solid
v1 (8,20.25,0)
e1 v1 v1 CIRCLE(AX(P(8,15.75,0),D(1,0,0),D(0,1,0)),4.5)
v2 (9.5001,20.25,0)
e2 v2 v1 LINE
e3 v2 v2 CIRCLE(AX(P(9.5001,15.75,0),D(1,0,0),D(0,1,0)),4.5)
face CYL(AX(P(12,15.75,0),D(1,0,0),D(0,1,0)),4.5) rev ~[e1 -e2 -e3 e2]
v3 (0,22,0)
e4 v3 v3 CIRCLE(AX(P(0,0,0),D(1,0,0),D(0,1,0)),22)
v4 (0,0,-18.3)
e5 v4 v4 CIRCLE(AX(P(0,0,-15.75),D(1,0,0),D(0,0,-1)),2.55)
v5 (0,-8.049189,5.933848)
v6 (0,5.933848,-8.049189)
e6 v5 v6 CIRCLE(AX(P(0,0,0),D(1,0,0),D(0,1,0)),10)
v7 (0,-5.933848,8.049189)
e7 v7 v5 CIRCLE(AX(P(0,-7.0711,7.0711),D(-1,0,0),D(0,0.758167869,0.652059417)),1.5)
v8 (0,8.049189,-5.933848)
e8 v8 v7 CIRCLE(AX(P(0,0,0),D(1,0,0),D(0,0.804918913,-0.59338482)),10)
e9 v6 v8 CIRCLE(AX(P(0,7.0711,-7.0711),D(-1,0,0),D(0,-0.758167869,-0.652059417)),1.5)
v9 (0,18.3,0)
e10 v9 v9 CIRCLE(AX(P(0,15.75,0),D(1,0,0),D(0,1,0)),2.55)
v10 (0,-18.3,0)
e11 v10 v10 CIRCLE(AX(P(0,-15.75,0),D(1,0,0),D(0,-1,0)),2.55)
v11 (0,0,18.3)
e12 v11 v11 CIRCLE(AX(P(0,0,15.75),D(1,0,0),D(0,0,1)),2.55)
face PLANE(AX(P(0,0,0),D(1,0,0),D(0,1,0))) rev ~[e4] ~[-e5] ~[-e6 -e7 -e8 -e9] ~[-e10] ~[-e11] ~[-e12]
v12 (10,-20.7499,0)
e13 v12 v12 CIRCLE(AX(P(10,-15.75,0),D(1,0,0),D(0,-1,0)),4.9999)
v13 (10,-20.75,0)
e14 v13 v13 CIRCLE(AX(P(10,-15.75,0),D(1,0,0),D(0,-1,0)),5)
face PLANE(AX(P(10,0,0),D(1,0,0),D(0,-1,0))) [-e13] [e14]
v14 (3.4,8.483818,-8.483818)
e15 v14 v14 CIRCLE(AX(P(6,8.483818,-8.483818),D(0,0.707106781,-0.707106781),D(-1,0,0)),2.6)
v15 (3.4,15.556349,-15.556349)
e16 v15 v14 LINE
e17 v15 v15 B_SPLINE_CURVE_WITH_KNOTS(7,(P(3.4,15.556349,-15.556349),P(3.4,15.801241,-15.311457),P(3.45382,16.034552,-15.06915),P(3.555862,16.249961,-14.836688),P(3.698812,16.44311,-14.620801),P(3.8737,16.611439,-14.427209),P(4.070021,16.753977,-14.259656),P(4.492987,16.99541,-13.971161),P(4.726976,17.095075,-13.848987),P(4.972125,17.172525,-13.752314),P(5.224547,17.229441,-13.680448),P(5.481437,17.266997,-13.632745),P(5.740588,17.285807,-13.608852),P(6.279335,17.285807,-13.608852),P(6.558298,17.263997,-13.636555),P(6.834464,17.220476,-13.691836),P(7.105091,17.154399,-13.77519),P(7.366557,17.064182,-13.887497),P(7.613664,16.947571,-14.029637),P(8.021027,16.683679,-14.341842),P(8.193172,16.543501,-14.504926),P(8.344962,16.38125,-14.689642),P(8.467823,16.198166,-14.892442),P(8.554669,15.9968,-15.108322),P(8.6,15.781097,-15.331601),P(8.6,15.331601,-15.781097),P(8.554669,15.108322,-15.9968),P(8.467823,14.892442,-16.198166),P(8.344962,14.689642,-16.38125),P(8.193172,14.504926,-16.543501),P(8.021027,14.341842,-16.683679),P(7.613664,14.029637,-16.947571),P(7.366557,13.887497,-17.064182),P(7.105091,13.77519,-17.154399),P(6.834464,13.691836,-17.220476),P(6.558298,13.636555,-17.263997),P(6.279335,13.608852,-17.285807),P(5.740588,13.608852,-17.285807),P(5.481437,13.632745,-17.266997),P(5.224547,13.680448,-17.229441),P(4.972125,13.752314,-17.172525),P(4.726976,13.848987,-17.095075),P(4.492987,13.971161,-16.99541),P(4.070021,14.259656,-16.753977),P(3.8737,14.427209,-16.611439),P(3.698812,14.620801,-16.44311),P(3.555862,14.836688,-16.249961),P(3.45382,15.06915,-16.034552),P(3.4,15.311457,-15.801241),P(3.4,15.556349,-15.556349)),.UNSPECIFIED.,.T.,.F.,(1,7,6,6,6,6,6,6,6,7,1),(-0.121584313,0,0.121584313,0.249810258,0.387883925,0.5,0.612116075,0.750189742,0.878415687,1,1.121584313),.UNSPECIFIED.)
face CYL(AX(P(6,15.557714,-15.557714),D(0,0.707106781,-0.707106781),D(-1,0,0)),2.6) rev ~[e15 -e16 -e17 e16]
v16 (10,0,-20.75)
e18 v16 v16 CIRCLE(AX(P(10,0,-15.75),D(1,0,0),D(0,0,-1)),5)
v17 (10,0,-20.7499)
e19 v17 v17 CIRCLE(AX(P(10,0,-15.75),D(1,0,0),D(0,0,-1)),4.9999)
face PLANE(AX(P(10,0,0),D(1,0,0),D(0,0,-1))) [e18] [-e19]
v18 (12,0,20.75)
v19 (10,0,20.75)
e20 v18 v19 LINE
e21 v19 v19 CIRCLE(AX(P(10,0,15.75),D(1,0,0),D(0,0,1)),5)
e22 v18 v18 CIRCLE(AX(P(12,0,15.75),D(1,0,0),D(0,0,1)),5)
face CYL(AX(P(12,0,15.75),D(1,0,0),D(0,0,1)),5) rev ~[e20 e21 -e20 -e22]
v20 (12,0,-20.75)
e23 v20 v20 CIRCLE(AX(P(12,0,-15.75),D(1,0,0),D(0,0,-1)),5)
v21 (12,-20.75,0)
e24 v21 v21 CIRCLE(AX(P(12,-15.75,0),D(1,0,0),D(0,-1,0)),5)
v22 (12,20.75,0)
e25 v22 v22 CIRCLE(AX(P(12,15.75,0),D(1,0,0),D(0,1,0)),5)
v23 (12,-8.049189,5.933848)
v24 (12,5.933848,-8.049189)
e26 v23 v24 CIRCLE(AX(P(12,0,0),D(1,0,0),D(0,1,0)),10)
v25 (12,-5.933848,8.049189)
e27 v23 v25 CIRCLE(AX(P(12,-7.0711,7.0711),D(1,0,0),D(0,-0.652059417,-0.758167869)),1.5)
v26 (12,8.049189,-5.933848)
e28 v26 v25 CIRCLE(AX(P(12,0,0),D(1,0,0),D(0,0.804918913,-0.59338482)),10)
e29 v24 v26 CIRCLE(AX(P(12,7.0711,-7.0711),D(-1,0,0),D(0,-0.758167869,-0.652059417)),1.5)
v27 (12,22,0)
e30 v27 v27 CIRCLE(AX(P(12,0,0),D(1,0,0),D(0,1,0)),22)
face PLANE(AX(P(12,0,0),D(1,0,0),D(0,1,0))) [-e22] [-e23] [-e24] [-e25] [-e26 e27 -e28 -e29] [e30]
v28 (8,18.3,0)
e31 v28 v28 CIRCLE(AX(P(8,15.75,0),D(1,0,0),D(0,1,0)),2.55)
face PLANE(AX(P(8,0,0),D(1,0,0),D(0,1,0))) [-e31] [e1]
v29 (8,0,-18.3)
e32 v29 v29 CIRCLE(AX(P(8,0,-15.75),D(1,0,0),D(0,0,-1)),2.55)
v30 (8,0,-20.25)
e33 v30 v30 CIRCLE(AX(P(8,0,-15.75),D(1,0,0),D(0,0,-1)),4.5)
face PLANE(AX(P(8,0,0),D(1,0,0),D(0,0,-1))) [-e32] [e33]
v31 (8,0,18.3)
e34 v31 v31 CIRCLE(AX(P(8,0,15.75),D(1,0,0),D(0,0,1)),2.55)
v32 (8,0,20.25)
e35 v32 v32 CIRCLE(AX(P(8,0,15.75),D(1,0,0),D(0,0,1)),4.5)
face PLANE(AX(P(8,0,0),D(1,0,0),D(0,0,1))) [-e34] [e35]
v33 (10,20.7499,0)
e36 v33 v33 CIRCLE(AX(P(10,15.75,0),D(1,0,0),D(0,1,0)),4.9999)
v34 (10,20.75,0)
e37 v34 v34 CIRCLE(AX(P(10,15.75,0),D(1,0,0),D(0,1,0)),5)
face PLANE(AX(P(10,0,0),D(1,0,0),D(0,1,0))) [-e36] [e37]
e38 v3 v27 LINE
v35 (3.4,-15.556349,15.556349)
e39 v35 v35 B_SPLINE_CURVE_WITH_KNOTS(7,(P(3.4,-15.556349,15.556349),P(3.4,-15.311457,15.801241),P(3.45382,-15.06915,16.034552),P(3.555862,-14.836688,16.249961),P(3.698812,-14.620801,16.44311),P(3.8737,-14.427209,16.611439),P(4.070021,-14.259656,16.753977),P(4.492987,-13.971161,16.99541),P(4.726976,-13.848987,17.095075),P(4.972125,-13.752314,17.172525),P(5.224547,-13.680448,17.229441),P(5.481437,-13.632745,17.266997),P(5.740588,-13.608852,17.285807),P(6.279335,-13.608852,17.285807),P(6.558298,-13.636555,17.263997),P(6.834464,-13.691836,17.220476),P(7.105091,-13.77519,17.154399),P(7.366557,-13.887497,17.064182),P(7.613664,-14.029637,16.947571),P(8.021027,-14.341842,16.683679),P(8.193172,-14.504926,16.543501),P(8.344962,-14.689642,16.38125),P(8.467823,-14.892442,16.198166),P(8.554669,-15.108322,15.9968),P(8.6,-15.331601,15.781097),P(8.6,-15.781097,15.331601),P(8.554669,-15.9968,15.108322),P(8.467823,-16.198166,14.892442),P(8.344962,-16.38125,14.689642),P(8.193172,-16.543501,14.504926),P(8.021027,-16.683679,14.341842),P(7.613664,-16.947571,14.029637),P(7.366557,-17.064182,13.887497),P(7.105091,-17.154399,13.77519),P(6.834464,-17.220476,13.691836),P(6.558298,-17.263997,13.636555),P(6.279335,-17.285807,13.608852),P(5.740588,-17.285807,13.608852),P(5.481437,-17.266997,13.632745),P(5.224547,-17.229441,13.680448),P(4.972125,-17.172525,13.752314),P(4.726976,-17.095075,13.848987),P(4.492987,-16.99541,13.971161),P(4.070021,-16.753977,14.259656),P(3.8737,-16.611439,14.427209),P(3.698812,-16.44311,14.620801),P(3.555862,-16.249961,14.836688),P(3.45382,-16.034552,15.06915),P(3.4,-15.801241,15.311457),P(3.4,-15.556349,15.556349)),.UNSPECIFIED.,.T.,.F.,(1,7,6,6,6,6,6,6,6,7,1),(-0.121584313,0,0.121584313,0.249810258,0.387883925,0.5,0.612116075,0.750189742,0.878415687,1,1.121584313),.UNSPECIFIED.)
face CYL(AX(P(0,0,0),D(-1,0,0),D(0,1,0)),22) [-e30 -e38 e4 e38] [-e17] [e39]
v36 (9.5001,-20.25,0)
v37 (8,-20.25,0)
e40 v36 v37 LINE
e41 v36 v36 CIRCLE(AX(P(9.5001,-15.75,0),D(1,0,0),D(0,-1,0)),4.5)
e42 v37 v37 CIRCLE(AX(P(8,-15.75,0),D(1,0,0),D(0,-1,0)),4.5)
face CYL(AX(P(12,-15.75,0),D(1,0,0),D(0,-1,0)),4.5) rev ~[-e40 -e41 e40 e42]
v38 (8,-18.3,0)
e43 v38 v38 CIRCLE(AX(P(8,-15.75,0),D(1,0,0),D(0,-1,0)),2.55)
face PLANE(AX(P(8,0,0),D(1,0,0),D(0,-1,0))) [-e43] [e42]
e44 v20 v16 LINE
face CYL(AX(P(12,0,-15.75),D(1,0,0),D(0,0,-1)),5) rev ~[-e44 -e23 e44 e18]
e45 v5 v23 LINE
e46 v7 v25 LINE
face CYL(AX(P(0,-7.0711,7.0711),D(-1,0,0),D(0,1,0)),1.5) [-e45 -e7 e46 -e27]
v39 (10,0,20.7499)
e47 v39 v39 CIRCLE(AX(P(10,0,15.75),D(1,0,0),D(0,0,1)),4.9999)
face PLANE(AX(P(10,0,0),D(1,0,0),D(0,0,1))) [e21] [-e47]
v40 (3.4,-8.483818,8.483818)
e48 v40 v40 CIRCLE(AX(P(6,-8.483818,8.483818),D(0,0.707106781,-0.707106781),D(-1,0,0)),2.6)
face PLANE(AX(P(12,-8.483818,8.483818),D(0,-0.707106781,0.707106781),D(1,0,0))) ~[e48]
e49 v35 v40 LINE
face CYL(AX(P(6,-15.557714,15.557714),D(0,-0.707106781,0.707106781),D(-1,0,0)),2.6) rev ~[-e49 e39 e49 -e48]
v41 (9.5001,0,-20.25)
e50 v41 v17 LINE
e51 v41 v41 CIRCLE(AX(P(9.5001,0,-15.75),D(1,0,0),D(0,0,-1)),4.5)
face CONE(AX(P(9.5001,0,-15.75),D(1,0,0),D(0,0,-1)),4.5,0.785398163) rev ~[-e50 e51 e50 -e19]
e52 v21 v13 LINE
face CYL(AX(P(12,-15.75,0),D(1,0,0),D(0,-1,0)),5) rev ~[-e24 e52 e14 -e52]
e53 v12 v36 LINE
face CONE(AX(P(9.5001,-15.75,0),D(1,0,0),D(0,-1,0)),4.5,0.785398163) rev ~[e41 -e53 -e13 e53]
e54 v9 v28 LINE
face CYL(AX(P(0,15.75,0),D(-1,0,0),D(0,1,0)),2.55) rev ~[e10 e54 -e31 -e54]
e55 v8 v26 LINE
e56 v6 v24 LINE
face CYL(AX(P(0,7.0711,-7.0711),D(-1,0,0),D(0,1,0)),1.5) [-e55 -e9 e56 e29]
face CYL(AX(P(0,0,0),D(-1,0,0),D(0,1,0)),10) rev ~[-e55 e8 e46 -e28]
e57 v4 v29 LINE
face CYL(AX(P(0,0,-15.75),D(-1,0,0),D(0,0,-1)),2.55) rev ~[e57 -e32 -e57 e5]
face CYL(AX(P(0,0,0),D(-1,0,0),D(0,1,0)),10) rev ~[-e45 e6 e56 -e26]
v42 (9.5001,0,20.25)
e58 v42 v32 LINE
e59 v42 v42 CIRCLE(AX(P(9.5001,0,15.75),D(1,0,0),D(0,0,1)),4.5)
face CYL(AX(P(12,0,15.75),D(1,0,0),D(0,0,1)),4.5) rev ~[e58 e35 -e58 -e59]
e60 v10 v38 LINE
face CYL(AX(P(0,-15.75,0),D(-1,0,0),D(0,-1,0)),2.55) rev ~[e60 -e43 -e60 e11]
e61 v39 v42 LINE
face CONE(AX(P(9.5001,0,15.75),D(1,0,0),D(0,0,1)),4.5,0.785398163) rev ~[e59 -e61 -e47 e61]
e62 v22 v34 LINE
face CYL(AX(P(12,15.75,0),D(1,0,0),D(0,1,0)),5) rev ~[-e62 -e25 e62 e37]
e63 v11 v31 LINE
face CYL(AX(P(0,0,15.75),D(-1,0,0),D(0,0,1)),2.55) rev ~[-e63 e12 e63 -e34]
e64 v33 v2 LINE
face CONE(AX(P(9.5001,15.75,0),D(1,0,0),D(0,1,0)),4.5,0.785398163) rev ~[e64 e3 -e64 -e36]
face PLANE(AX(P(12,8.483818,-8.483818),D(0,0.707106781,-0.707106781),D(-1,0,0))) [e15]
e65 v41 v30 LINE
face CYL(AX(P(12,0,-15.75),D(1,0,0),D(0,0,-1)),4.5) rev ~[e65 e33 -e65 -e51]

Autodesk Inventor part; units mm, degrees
ref_plane "YZ Plane" through (0, 0, 0) normal (1, 0, 0) x (0, 1, 0)
ref_plane "XZ Plane" through (0, 0, 0) normal (0, 1, 0) x (-1, 0, 0)
ref_plane "XY Plane" through (0, 0, 0) normal (0, 0, 1) x (1, 0, 0)
sketch "Sketch2" plane through (0, 0, 0) normal (1, 0, 0) x (0, 1, 0)
  circle A0 centre (0, 0) radius 10
  circle A1 centre (0, 0) radius 22
  line L0 (0, 0) -> (7.0711, -7.0711)
  line L1 (0, 0) -> (10, 0) construction
  circle A2 centre (7.0711, -7.0711) radius 1.5
  line L2 (0, 0) -> (10.8294, 10.8294)
  line L3 (0, 0) -> (15.315, 0) construction
  circle A3 centre (-7.0711, 7.0711) radius 1.5
  dimension "d3" = 20
  dimension "d4" = 44
  dimension "d16" = 10
  dimension "d17" = 45
  dimension "d18" = 3
  dimension "d19" = 45
extrude "Extrusion1" add sketch "Sketch2" along normal blind 12 contours A2 A0 | A0 L0 A2 | A3 A0 | A0 A3 | A0 A2 L0 | A1
sketch "Sketch4" plane through (0, 0, 0) normal (1, 0, 0) x (0, 0, -1)
  circle A0 centre (0, 0) radius 15.75
  circle A1 centre (15.75, 0) radius 2.55
  dimension "d9" = 31.5
  dimension "d10" = 5.1
extrude "Extrusion3" cut sketch "Sketch4" along normal blind 30 contours A0 A1 | A0 A1 picked at (14.9184, -0.4924) picked at (16.4994, -0.6699)
sketch "Sketch5" plane through (12, 0, 0) normal (1, 0, 0) x (0, 0, -1)
  circle A0 centre (15.75, 0) radius 2.55 projected
  circle A1 centre (15.75, 0) radius 4.5
  point P0 (0, 0)
  dimension "d20" = 9
extrude "Extrusion4" cut sketch "Sketch5" against normal blind 4
sketch "Sketch6" plane through (12, 0, 0) normal (1, 0, 0) x (0, 0, -1)
  line L0 (0, 0) -> (15.5563, 15.5563)
  line L1 (0, 0) -> (22, 0) construction
  dimension "d23" = 22
  dimension "d24" = 45
ref_plane "Work Plane1" through (12, 15.5563, -15.5563) normal (0, 0.7071068, -0.7071068) x (-1, 0, 0)
sketch "Sketch7" plane through (12, 15.5563, -15.5563) normal (0, 0.7071068, -0.7071068) x (-1, 0, 0)
  line L0 (0, 22) -> (0, -22) projected
  line L1 (0, 0) -> (12, 0)
  circle A0 centre (6, 0) radius 2.6
  dimension "d25" = 5.2
extrude "Extrusion5" cut sketch "Sketch7" against normal blind 10
ref_plane "Work Plane2" through (12, 0, 0) normal (0, 0.7071068, -0.7071068) x (-1, 0, 0)
thread "Thread1" size "M5x0.8" class "6H" standard "ANSI Metric M Profile" full length
mirror "Mirror1" about plane through (12, 0, 0) normal (0, 0.7071068, -0.7071068) of "Extrusion5"
sketch "Sketch8" plane through (12, 0, 0) normal (1, 0, 0) x (0, 0, -1)
  line L0 (0, 0) -> (22, 0) construction
  circle A0 centre (15.75, 0) radius 2.55 projected
  circle A1 centre (15.75, 0) radius 5
  dimension "d33" = 10
extrude "Extrusion6" cut sketch "Sketch8" against normal blind 2
chamfer "Chamfer2" distance 0.5 angle 45 1 edges at (10, 0, -11.25)
pattern_circular "Circular Pattern1" count 4 over 360 about axis through (-10, 0, 0) along (1, 0, 0) of "Extrusion3", "Extrusion4", "Extrusion6", "Chamfer2"
properties part number "Pen Holder Interface V2"
